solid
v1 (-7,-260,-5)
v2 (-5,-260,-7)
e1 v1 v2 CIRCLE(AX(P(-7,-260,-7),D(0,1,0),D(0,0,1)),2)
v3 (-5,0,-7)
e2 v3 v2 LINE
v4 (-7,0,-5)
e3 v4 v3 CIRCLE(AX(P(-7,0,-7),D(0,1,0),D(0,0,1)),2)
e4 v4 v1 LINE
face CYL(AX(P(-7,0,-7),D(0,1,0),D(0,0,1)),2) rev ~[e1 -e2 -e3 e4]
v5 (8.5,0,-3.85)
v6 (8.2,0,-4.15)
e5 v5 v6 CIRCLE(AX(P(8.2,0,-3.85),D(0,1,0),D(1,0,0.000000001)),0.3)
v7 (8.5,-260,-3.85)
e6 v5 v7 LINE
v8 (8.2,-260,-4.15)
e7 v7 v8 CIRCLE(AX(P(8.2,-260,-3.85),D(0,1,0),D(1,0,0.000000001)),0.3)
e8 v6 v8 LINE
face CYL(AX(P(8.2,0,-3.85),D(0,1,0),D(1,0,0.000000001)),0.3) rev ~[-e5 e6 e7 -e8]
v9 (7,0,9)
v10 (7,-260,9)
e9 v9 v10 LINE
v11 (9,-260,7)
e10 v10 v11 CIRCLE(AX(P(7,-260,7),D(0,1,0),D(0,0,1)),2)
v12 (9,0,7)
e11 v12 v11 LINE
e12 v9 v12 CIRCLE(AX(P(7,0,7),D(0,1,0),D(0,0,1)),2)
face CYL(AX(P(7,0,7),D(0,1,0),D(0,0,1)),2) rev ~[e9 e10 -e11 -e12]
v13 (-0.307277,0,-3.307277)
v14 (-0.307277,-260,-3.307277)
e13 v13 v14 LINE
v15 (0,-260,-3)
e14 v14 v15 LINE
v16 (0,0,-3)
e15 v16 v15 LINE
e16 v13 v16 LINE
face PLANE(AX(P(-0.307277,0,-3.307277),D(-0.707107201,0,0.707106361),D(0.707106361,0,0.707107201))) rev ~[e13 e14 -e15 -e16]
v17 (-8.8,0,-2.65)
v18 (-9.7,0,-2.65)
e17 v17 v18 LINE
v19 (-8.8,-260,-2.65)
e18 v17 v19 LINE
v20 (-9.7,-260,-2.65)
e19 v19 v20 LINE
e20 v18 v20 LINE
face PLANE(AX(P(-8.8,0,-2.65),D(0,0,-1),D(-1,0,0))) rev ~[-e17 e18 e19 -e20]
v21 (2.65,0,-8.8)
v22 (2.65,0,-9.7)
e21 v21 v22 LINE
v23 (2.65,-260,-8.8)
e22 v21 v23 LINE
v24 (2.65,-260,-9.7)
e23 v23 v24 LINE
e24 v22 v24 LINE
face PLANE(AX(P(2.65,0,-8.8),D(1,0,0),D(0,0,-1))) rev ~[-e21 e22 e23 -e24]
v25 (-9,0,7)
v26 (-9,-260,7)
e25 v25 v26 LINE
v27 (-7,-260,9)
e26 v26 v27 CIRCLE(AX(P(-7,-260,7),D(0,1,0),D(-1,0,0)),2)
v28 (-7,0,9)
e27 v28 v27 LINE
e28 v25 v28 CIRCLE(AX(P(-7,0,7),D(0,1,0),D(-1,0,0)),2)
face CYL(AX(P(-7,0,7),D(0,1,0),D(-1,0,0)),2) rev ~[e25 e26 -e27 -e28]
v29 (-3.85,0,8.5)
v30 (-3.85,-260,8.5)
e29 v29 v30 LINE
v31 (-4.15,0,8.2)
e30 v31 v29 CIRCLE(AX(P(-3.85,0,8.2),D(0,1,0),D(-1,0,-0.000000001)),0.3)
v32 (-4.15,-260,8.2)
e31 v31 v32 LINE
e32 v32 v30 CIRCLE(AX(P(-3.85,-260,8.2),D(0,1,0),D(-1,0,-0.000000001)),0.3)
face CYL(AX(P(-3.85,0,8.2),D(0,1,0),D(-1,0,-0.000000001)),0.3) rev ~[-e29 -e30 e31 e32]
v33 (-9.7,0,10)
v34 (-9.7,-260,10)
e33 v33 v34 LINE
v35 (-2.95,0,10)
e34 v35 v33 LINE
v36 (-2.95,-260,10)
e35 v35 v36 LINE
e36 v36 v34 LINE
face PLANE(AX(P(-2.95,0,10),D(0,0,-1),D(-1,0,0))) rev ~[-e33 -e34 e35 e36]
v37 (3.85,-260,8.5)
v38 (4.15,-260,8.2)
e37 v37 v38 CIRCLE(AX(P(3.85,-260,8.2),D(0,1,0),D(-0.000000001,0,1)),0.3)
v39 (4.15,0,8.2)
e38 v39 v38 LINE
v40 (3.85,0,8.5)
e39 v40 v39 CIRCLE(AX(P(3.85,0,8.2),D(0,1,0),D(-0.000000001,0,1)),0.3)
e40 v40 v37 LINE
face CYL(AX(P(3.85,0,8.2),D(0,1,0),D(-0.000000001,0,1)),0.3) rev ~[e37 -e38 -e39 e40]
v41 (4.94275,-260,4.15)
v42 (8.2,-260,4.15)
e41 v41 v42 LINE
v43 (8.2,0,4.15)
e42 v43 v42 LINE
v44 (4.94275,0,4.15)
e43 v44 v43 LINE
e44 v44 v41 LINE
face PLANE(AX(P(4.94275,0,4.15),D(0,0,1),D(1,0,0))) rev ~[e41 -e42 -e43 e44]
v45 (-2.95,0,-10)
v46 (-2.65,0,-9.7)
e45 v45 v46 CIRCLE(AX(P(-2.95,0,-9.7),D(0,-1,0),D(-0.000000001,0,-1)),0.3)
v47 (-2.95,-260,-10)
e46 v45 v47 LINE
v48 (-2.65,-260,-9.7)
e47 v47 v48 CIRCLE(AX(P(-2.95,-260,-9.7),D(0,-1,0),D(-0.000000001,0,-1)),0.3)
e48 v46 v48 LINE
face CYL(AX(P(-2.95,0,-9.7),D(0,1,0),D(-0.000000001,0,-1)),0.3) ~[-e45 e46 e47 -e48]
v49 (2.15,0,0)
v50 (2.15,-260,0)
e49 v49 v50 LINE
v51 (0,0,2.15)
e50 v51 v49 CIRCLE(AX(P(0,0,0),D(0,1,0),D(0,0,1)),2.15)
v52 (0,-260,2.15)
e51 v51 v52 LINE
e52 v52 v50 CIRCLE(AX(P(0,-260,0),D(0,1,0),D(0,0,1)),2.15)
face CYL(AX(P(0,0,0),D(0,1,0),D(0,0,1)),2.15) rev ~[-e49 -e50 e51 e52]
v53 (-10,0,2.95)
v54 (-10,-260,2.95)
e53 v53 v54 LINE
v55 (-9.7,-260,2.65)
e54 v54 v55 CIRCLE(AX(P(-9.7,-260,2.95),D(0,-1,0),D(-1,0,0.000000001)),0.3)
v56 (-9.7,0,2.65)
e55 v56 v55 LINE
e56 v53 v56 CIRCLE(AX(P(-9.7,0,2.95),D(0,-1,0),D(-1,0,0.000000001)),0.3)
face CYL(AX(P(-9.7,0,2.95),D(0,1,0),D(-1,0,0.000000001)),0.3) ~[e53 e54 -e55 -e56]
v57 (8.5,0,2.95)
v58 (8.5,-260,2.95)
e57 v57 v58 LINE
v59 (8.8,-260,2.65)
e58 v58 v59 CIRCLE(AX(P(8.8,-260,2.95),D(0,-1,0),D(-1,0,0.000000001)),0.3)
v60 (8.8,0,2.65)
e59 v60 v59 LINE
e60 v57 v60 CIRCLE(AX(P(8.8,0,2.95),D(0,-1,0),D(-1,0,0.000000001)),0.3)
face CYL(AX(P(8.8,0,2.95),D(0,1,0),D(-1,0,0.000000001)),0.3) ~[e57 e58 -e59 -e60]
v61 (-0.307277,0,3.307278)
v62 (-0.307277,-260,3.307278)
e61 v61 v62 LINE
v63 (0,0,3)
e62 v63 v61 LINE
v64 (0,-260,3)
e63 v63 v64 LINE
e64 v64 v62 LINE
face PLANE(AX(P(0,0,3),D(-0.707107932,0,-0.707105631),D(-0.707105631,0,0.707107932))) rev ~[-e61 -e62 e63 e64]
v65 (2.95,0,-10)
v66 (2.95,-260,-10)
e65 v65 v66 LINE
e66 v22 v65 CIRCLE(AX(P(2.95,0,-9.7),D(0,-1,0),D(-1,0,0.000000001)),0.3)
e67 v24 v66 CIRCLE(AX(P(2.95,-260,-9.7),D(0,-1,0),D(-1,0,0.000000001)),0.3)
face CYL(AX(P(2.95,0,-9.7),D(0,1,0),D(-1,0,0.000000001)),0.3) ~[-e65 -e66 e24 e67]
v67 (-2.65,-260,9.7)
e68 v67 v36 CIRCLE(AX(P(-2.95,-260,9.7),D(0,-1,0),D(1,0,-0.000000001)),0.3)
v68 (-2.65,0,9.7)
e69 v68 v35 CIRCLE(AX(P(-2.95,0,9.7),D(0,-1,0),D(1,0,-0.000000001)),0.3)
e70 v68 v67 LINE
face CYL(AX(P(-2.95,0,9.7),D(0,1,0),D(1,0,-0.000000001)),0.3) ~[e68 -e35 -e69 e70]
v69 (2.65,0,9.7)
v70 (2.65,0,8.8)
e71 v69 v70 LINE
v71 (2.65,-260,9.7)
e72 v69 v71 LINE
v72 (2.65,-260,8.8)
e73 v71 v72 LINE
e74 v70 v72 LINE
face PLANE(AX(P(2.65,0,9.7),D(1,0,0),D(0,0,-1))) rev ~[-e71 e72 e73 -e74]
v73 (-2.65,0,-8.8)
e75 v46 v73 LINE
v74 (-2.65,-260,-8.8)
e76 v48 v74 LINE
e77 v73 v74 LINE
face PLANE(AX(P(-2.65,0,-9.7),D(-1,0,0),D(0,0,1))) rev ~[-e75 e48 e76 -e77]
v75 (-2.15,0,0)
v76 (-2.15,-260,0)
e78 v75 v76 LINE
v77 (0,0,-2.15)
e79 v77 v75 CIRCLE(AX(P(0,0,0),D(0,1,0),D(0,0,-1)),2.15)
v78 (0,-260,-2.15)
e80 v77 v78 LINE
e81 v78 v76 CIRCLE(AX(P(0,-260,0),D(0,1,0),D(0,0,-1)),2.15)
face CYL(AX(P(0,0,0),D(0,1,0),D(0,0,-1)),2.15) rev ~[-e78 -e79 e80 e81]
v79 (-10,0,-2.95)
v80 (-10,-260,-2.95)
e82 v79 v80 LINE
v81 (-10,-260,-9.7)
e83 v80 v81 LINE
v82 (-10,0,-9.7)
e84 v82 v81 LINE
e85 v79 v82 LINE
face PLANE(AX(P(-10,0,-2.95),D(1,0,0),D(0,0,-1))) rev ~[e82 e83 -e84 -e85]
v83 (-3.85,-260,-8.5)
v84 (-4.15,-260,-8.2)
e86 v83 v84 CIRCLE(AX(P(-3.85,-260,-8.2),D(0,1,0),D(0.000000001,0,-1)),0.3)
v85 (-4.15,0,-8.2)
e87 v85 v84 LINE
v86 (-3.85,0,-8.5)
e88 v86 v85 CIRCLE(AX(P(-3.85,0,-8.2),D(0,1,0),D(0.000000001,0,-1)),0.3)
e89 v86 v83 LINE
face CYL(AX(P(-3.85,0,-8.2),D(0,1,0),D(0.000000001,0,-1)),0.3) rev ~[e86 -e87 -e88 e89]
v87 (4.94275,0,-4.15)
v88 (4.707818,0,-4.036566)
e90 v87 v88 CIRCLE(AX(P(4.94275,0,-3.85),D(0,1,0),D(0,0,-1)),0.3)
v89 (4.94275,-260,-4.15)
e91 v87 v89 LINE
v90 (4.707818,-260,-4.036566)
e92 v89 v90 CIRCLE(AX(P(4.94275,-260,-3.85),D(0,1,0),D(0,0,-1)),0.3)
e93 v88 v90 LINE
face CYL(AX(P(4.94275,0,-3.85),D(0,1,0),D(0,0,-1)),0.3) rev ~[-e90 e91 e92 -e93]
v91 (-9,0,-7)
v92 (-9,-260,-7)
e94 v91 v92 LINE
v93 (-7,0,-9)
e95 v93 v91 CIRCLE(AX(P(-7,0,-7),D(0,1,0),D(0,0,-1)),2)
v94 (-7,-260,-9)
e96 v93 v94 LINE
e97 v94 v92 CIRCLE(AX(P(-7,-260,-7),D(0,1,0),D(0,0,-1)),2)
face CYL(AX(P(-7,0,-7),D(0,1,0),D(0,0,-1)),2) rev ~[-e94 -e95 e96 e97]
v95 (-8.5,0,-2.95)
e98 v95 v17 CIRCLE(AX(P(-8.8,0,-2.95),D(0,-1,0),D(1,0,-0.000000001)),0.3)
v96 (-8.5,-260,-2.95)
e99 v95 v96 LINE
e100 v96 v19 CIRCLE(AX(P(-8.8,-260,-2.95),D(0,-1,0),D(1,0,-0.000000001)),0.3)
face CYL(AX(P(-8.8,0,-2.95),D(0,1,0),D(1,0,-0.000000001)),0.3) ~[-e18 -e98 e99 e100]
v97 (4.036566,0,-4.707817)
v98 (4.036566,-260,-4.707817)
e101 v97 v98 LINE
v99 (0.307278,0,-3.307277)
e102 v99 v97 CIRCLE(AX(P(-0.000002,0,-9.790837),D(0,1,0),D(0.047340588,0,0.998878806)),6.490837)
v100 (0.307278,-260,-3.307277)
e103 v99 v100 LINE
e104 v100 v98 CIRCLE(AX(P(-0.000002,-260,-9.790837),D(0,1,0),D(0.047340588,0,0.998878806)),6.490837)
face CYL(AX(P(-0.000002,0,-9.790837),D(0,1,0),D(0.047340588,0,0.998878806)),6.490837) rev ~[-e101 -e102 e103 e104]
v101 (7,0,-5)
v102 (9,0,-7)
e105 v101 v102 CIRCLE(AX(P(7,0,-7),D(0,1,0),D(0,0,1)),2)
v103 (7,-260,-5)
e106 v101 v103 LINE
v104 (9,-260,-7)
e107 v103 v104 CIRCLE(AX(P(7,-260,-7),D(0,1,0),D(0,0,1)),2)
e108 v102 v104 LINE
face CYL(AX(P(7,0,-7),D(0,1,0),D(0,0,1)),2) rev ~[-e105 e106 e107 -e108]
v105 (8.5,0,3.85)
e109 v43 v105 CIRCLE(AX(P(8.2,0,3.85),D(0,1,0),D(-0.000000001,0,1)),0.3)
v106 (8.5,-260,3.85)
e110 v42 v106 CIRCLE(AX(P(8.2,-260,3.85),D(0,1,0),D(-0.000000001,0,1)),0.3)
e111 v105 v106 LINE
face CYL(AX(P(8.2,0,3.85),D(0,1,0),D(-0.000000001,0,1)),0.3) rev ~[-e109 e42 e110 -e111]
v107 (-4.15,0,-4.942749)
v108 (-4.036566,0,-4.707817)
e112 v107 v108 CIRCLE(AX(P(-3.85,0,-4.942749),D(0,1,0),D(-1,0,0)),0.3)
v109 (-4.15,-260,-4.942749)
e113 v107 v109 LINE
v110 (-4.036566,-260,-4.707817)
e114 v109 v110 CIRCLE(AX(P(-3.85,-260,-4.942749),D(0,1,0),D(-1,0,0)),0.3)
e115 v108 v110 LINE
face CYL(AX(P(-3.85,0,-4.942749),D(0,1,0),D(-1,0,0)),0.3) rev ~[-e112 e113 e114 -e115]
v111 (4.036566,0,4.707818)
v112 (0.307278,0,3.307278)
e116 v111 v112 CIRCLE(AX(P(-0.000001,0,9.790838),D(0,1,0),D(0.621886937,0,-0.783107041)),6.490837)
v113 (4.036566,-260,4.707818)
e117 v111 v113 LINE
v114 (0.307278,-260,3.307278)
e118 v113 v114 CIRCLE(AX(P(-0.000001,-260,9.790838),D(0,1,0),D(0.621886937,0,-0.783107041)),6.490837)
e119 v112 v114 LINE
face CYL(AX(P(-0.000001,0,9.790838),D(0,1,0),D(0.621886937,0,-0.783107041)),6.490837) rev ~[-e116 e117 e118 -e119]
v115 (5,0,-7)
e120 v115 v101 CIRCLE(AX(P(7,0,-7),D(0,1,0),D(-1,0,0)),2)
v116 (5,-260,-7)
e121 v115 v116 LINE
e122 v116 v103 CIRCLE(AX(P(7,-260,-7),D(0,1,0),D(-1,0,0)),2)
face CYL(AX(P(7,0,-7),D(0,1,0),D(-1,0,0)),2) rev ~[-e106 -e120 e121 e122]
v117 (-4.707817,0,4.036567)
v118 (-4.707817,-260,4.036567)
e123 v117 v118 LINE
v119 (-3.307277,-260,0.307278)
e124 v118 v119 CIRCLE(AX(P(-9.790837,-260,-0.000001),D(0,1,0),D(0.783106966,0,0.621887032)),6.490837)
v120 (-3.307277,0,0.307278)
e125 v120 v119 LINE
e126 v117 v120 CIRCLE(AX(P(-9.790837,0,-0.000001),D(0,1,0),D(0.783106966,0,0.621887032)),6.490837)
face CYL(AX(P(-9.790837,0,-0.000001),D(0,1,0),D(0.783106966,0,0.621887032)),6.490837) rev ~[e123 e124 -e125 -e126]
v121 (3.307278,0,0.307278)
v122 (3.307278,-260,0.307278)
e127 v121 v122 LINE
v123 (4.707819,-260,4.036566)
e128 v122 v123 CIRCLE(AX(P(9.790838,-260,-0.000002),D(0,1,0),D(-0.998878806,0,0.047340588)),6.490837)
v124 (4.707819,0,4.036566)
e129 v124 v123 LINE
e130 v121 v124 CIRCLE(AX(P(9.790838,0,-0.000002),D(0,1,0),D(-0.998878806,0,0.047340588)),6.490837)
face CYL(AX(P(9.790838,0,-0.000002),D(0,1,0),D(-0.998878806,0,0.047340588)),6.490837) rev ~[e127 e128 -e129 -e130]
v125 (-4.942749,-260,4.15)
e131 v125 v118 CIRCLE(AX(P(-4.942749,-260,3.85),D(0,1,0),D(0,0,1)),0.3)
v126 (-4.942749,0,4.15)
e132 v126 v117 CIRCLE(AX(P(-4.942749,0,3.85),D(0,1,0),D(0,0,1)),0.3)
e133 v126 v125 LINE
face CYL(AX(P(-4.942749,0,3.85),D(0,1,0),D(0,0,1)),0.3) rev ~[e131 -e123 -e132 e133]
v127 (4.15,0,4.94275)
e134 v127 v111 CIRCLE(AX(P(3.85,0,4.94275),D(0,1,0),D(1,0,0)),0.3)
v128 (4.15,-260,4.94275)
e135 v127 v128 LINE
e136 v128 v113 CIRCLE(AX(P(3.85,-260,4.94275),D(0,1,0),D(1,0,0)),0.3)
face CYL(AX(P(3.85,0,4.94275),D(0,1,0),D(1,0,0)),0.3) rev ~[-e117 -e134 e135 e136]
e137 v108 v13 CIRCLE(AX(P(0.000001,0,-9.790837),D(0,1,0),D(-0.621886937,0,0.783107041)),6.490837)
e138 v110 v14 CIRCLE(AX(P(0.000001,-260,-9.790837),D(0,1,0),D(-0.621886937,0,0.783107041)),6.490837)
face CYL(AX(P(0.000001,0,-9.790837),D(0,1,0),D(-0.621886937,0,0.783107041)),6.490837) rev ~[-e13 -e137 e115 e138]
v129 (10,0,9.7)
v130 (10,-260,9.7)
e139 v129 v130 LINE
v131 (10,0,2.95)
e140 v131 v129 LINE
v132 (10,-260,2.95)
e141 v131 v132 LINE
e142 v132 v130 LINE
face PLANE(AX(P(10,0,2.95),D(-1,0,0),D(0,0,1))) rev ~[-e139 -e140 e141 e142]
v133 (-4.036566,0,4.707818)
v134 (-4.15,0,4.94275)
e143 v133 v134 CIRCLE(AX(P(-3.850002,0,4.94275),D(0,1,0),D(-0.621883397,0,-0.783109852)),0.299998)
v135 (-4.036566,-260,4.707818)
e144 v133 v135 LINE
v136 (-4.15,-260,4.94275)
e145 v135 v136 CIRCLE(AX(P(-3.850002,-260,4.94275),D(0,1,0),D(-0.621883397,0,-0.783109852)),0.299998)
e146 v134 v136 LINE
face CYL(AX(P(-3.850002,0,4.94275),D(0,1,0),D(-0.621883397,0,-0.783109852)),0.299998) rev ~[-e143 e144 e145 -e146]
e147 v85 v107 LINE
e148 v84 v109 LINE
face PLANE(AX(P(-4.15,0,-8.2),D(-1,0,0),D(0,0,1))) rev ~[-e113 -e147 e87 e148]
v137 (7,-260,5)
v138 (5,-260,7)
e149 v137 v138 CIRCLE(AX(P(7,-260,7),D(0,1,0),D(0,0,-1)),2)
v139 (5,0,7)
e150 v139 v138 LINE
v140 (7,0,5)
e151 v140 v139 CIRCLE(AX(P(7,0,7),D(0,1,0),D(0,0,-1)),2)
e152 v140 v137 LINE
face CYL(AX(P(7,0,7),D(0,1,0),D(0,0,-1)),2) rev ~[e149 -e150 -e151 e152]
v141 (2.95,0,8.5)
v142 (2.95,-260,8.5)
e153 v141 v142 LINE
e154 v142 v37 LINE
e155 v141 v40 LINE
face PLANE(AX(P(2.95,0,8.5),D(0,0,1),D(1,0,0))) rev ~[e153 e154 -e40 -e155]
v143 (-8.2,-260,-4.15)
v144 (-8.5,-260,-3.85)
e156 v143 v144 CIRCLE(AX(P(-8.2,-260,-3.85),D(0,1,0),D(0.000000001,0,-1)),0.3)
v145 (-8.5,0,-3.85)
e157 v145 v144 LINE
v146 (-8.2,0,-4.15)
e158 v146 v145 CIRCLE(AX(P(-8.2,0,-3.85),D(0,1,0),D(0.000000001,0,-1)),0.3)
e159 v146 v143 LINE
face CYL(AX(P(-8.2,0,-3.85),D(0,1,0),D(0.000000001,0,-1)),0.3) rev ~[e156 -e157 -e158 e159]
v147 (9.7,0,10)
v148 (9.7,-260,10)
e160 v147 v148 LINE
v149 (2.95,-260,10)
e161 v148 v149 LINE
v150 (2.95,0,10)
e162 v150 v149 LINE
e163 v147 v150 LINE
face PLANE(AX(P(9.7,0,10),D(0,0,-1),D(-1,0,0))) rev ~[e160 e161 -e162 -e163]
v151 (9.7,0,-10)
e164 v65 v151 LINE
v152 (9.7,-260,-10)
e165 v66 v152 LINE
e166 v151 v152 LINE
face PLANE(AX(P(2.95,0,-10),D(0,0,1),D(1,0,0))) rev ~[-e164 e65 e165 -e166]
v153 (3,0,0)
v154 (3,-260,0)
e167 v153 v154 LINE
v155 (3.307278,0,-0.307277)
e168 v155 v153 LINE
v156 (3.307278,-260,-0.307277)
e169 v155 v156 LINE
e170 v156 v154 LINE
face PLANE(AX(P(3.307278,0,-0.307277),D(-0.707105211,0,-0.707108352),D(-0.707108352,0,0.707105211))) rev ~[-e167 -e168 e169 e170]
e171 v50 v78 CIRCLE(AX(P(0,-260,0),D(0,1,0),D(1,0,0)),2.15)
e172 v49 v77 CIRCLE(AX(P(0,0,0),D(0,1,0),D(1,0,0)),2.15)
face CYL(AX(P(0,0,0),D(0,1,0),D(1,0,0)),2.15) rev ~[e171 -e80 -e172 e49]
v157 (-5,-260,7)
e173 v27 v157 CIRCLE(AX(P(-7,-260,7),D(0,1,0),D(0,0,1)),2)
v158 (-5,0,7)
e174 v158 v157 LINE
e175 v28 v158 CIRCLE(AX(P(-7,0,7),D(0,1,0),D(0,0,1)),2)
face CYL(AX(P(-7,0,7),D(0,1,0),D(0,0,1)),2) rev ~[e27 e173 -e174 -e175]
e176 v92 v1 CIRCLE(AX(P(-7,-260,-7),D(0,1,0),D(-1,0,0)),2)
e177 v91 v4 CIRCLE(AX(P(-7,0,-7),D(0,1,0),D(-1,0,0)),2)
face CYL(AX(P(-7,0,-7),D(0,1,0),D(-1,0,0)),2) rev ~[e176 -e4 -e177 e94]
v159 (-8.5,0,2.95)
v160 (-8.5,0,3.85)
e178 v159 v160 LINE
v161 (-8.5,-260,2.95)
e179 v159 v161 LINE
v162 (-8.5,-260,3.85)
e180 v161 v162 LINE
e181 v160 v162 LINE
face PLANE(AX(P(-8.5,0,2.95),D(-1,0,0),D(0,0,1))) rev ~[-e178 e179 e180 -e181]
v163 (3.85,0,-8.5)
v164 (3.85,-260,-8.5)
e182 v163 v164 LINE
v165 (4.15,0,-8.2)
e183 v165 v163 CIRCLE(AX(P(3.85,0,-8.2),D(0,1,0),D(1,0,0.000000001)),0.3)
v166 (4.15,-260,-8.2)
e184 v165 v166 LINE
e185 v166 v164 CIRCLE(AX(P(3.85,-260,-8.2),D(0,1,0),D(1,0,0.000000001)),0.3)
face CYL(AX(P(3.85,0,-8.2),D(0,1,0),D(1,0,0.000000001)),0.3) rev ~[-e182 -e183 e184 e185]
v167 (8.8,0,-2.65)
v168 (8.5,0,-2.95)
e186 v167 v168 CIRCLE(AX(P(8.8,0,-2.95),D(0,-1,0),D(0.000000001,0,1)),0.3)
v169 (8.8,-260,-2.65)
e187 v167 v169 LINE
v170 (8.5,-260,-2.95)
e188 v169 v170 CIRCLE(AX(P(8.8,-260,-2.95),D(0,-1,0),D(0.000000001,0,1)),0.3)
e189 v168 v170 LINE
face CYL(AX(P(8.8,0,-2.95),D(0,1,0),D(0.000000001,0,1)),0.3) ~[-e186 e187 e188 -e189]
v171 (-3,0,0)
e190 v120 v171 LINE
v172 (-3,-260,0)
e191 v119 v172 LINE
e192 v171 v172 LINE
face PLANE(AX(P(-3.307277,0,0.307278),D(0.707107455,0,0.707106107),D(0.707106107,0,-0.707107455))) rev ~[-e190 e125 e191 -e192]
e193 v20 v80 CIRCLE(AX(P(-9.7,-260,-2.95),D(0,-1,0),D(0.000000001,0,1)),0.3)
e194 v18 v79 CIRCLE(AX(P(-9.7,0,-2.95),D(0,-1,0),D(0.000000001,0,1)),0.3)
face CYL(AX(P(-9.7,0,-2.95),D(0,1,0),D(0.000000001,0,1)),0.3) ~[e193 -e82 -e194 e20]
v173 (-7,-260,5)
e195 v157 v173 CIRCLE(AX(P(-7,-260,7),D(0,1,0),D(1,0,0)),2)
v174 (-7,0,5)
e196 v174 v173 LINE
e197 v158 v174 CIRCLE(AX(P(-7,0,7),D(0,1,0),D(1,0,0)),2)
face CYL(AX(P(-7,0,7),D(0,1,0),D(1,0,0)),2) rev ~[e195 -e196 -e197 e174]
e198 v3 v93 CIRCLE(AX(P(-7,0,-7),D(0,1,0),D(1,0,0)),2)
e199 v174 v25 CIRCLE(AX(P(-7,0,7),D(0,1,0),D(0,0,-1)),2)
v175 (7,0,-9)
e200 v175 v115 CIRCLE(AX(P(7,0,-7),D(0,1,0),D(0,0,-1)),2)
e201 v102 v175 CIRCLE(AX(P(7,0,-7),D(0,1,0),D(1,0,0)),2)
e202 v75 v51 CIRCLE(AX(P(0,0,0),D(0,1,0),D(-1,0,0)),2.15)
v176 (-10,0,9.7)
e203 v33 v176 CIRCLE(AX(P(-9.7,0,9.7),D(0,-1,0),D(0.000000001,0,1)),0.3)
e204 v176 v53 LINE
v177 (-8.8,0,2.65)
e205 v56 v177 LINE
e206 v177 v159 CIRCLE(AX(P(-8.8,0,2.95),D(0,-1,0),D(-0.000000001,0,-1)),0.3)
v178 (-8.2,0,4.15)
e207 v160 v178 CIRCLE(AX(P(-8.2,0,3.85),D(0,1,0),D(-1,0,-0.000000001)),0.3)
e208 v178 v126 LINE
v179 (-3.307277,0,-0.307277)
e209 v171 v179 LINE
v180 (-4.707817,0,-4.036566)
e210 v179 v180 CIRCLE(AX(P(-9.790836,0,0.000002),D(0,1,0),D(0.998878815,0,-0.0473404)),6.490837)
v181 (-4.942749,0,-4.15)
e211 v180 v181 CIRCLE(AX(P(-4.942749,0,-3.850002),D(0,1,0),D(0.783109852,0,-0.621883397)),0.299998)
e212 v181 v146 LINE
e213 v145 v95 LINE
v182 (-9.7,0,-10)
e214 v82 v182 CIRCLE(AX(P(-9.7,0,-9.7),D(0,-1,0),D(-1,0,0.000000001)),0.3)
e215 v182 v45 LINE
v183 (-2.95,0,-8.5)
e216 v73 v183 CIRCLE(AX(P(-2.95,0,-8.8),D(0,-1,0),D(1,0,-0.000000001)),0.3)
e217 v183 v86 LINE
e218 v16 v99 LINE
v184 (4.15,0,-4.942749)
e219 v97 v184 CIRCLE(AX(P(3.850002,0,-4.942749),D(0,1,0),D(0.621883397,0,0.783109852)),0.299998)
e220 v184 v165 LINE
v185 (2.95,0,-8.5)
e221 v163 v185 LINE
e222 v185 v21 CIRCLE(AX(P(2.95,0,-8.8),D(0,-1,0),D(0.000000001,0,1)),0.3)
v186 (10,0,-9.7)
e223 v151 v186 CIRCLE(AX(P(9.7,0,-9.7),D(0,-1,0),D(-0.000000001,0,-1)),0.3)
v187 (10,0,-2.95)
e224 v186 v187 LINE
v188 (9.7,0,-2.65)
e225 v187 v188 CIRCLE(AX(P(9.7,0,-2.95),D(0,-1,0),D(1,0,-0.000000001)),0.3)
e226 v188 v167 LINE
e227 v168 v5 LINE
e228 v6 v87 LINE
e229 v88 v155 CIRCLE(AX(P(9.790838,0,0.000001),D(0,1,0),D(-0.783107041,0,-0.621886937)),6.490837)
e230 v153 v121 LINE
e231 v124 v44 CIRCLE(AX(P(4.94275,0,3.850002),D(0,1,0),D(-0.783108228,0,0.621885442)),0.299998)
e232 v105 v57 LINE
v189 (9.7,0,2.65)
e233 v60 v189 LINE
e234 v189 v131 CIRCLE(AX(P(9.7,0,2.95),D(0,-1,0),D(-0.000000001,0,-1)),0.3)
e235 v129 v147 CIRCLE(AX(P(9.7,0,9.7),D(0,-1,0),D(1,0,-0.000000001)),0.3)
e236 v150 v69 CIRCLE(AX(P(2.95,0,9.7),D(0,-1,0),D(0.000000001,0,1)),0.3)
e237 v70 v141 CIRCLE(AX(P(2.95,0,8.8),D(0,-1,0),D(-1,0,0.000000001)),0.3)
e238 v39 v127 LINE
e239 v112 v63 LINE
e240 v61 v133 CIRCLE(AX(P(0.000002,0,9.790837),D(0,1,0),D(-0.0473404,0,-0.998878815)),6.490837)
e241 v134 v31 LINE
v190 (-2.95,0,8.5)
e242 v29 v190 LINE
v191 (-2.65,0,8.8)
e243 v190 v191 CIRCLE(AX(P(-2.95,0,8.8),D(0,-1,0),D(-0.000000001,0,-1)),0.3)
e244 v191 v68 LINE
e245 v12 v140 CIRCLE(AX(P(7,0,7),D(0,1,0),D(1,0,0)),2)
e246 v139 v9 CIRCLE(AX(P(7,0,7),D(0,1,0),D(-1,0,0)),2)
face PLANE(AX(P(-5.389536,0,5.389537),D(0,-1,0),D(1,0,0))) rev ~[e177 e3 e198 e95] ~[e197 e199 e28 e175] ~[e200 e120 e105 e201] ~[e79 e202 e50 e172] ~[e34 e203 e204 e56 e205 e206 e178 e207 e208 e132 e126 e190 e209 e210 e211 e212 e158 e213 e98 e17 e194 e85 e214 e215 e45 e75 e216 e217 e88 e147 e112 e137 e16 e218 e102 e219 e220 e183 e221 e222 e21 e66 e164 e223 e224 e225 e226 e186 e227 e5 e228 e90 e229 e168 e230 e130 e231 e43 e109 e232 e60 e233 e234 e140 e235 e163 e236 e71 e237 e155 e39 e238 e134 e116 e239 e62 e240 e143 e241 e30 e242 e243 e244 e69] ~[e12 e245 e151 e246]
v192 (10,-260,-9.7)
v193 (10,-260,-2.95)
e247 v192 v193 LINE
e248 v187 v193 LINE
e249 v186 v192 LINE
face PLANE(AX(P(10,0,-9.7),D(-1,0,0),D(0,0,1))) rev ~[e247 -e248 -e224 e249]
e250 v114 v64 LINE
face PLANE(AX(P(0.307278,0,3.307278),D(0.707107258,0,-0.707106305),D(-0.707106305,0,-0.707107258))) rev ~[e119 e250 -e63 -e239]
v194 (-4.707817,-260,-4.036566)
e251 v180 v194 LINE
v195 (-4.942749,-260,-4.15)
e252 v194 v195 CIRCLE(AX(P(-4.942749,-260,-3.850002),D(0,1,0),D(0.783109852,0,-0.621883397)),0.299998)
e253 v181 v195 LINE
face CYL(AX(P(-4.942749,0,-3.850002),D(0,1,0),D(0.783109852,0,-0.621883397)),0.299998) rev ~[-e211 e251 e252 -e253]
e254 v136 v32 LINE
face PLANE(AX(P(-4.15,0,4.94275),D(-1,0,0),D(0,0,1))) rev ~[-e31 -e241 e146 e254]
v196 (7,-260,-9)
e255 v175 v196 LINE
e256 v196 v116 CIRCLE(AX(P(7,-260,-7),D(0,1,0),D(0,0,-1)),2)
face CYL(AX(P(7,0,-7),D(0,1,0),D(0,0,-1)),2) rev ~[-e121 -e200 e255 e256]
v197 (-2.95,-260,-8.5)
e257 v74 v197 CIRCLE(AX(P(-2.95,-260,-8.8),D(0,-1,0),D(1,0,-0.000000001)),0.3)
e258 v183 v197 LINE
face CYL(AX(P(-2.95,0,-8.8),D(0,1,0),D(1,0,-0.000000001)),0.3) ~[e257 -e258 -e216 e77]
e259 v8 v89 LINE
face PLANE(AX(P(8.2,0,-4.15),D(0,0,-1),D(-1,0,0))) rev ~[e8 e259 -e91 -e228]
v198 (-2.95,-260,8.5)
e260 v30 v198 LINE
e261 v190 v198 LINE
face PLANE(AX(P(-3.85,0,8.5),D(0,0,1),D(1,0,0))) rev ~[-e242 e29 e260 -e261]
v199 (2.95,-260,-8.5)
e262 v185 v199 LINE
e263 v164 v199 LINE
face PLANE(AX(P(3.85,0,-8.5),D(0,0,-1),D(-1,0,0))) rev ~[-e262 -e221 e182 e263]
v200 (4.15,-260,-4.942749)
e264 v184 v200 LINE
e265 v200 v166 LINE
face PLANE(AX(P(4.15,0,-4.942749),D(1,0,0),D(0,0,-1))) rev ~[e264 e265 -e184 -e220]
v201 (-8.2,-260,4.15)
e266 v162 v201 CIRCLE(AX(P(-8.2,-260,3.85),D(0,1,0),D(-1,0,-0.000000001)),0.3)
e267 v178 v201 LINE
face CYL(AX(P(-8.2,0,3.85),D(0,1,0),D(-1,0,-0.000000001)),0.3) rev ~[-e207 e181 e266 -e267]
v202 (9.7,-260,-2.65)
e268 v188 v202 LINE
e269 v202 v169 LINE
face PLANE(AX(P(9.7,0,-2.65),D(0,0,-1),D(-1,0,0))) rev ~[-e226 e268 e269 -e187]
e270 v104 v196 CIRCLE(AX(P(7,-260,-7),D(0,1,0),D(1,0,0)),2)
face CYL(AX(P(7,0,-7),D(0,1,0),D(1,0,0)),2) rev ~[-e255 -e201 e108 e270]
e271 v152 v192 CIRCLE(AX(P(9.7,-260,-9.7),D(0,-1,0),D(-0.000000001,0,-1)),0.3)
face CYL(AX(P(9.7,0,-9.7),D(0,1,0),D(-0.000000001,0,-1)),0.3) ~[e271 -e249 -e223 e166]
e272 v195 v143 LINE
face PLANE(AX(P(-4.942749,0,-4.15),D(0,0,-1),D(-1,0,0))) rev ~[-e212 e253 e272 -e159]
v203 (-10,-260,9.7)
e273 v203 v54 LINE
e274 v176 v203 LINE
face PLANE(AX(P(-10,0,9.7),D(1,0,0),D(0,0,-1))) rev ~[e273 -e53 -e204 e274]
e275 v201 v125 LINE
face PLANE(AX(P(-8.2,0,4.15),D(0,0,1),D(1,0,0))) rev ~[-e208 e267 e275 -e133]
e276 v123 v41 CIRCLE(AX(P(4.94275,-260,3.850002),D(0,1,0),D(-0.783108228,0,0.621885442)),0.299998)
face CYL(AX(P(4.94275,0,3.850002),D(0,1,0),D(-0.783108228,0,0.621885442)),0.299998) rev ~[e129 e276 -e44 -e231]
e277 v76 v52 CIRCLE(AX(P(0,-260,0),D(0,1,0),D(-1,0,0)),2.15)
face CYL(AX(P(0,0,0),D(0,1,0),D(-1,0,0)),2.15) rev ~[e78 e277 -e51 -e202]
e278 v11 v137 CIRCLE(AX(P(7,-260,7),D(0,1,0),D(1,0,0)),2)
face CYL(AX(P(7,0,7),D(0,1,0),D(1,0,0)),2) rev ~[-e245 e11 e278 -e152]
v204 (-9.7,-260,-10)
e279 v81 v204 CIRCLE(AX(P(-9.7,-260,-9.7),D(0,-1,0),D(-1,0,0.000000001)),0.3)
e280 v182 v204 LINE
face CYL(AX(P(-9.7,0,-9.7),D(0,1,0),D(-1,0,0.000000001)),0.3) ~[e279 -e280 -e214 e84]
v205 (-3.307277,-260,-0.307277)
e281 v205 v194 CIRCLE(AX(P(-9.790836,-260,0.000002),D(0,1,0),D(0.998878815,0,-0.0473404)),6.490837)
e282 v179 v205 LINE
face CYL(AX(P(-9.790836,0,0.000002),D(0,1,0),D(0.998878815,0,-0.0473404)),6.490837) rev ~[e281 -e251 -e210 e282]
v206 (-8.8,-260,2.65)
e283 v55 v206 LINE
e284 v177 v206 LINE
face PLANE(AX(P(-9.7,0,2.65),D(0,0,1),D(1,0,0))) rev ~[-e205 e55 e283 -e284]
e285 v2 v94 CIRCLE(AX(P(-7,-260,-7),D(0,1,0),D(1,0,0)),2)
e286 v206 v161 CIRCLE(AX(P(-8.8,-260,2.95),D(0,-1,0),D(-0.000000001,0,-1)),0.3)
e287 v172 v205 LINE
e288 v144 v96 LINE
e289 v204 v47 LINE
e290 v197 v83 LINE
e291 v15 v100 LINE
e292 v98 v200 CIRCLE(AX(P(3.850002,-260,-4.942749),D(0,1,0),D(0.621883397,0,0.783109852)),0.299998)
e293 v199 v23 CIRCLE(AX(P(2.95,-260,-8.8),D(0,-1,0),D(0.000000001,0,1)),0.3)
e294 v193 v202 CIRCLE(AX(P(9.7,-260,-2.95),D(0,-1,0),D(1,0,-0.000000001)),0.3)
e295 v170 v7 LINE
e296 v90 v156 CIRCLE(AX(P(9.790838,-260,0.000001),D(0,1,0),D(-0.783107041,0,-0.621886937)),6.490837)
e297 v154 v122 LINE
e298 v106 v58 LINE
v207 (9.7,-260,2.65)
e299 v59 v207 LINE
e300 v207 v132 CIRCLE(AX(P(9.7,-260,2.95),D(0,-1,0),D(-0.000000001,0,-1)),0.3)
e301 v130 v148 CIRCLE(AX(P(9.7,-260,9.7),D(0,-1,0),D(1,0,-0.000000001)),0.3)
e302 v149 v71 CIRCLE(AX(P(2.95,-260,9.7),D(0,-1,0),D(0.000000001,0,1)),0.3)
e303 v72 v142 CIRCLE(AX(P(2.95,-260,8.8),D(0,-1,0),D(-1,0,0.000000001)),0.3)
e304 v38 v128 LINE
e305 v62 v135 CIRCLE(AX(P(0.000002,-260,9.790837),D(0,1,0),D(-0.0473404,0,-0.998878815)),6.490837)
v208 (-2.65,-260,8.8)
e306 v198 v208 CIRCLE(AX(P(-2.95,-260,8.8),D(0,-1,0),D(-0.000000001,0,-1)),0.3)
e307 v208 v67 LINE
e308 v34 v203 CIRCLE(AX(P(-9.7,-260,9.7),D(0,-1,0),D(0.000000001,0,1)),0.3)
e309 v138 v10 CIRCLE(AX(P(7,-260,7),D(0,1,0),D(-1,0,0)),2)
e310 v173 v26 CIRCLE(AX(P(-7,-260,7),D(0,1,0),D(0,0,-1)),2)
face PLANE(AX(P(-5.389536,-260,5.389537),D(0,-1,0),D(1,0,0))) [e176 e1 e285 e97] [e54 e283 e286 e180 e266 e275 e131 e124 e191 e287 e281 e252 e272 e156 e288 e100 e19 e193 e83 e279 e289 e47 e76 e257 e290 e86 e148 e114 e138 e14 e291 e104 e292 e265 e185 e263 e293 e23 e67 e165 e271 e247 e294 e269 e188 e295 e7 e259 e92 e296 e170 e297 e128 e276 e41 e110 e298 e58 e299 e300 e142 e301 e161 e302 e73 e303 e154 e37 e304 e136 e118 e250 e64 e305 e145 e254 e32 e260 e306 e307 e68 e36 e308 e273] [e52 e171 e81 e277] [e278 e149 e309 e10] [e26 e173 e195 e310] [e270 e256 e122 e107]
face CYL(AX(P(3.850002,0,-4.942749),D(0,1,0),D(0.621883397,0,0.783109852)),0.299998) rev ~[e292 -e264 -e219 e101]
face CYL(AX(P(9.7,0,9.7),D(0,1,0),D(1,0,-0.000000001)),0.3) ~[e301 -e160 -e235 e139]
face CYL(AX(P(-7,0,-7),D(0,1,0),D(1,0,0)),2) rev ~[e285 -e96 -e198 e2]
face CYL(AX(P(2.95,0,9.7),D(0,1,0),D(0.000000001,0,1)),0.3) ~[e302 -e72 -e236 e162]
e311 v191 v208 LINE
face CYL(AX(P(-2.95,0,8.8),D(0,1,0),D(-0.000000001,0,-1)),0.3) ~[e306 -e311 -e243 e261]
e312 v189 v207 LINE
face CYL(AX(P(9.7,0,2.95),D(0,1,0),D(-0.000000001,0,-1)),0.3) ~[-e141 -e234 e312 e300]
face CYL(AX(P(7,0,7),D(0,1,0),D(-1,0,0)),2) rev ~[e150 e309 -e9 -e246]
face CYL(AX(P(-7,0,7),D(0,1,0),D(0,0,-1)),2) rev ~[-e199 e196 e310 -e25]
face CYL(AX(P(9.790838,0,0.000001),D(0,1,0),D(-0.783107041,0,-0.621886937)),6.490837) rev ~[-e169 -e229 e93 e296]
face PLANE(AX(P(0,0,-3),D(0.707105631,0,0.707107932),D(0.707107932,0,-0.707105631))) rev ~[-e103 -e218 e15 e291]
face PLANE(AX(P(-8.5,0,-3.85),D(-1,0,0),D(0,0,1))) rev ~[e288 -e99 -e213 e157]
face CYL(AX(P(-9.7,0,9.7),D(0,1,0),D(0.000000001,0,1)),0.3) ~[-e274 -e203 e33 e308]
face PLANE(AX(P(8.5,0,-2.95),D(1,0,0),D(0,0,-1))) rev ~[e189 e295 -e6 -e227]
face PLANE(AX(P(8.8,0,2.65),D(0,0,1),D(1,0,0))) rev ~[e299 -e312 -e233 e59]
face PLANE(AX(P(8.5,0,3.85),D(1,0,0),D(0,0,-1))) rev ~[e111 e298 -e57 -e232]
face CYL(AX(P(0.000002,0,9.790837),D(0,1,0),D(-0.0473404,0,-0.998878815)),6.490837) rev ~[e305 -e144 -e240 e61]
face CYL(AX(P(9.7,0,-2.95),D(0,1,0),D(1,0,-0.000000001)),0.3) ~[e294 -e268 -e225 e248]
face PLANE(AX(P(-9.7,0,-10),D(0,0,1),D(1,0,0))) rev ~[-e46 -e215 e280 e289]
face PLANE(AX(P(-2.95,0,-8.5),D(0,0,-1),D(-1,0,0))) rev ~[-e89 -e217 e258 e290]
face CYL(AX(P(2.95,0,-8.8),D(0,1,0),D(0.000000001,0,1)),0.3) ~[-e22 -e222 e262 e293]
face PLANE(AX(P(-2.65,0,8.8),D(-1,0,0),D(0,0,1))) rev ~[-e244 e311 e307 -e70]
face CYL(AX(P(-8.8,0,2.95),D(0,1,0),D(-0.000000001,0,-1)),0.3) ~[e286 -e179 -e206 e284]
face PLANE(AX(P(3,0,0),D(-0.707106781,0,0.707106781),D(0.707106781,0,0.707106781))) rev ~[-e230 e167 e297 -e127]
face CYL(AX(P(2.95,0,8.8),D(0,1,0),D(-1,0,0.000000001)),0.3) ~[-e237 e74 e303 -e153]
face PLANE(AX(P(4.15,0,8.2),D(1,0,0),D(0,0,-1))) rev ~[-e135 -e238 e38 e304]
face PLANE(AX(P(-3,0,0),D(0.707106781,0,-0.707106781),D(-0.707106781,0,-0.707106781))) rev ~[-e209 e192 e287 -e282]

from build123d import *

# Parameters (mm, degrees)
F1_DEPTH = 260


# Not quite as in the source:
# - ends of sketch curves that miss each other by under 0.0002 mm in the source are joined


with BuildPart() as f1:
    # F0 (on Front) → F1 (new body)
    with BuildSketch(Plane.XZ):
        with BuildLine():
            ThreePointArc((-2.15, 0), (-1.5202795796, 1.5202795796), (0, 2.15))
            Line((0, 2.15), (0, 3))
            Line((0, 3), (-0.307277, 3.307278))
            ThreePointArc((-0.307277, 3.307278), (-2.2820211583, 3.7143800615), (-4.036565823, 4.7078182229))
            ThreePointArc((-4.036565823, 4.7078182229), (-4.1201572004, 4.8123081084), (-4.15, 4.94275))
            Line((-4.15, 4.94275), (-4.15, 8.2))
            ThreePointArc((-4.15, 8.2), (-4.0621320344, 8.4121320344), (-3.85, 8.5))
            Line((-3.85, 8.5), (-2.95, 8.5))
            ThreePointArc((-2.95, 8.5), (-2.7378679656, 8.5878679656), (-2.65, 8.8))
            Line((-2.65, 8.8), (-2.65, 9.7))
            ThreePointArc((-2.65, 9.7), (-2.7378679656, 9.9121320344), (-2.95, 10))
            Line((-2.95, 10), (-9.7, 10))
            ThreePointArc((-9.7, 10), (-9.9121320344, 9.9121320344), (-10, 9.7))
            Line((-10, 9.7), (-10, 2.95))
            ThreePointArc((-10, 2.95), (-9.9121320344, 2.7378679656), (-9.7, 2.65))
            Line((-9.7, 2.65), (-8.8, 2.65))
            ThreePointArc((-8.8, 2.65), (-8.5878679656, 2.7378679656), (-8.5, 2.95))
            Line((-8.5, 2.95), (-8.5, 3.85))
            ThreePointArc((-8.5, 3.85), (-8.4121320344, 4.0621320344), (-8.2, 4.15))
            Line((-8.2, 4.15), (-4.942749, 4.15))
            ThreePointArc((-4.942749, 4.15), (-4.812307461, 4.1201573706), (-4.7078173786, 4.0365666993))
            ThreePointArc((-4.7078173786, 4.0365666993), (-3.7143793747, 2.2820219924), (-3.3072773955, 0.3072779813))
            Line((-3.3072773955, 0.3072779813), (-3, 0))
            Line((-3, 0), (-2.15, 0))
        make_face()
        with BuildLine():
            ThreePointArc((-7, 5), (-8.4142135624, 5.5857864376), (-9, 7))
            ThreePointArc((-9, 7), (-8.4142135624, 8.4142135624), (-7, 9))
            ThreePointArc((-7, 9), (-5.5857864376, 8.4142135624), (-5, 7))
            ThreePointArc((-5, 7), (-5.5857864376, 5.5857864376), (-7, 5))
        make_face(mode=Mode.SUBTRACT)
        with BuildLine():
            ThreePointArc((0, 2.15), (1.5202795796, 1.5202795796), (2.15, 0))
            Line((2.15, 0), (3, 0))
            Line((3, 0), (3.307278, 0.307278))
            ThreePointArc((3.307278, 0.307278), (3.7143803747, 2.2820219924), (4.7078187099, 4.0365664363))
            ThreePointArc((4.7078187099, 4.0365664363), (4.812308461, 4.1201573706), (4.94275, 4.15))
            Line((4.94275, 4.15), (8.2, 4.15))
            ThreePointArc((8.2, 4.15), (8.4121320344, 4.0621320344), (8.5, 3.85))
            Line((8.5, 3.85), (8.5, 2.95))
            ThreePointArc((8.5, 2.95), (8.5878679656, 2.7378679656), (8.8, 2.65))
            Line((8.8, 2.65), (9.7, 2.65))
            ThreePointArc((9.7, 2.65), (9.9121320344, 2.7378679656), (10, 2.95))
            Line((10, 2.95), (10, 9.7))
            ThreePointArc((10, 9.7), (9.9121320344, 9.9121320344), (9.7, 10))
            Line((9.7, 10), (2.95, 10))
            ThreePointArc((2.95, 10), (2.7378679656, 9.9121320344), (2.65, 9.7))
            Line((2.65, 9.7), (2.65, 8.8))
            ThreePointArc((2.65, 8.8), (2.7378679656, 8.5878679656), (2.95, 8.5))
            Line((2.95, 8.5), (3.85, 8.5))
            ThreePointArc((3.85, 8.5), (4.0621320344, 8.4121320344), (4.15, 8.2))
            Line((4.15, 8.2), (4.15, 4.94275))
            ThreePointArc((4.15, 4.94275), (4.1201572004, 4.8123081084), (4.036566086, 4.7078178916))
            ThreePointArc((4.036566086, 4.7078178916), (2.2820216259, 3.7143802371), (0.3072779813, 3.3072783955))
            Line((0.3072779813, 3.3072783955), (0, 3))
            Line((0, 3), (0, 2.15))
        make_face()
        with BuildLine():
            ThreePointArc((7, 9), (8.4142135624, 8.4142135624), (9, 7))
            ThreePointArc((9, 7), (8.4142135624, 5.5857864376), (7, 5))
            ThreePointArc((7, 5), (5.5857864376, 5.5857864376), (5, 7))
            ThreePointArc((5, 7), (5.5857864376, 8.4142135624), (7, 9))
        make_face(mode=Mode.SUBTRACT)
        with BuildLine():
            Line((3, 0), (2.15, 0))
            ThreePointArc((2.15, 0), (1.5202795796, -1.5202795796), (0, -2.15))
            Line((0, -2.15), (0, -3))
            Line((0, -3), (0.307278, -3.307277))
            ThreePointArc((0.307278, -3.307277), (2.2820216259, -3.7143792371), (4.036565823, -4.7078172229))
            ThreePointArc((4.036565823, -4.7078172229), (4.1201572004, -4.8123071084), (4.15, -4.942749))
            Line((4.15, -4.942749), (4.15, -8.2))
            ThreePointArc((4.15, -8.2), (4.0621320344, -8.4121320344), (3.85, -8.5))
            Line((3.85, -8.5), (2.95, -8.5))
            ThreePointArc((2.95, -8.5), (2.7378679656, -8.5878679656), (2.65, -8.8))
            Line((2.65, -8.8), (2.65, -9.7))
            ThreePointArc((2.65, -9.7), (2.7378679656, -9.9121320344), (2.95, -10))
            Line((2.95, -10), (9.7, -10))
            ThreePointArc((9.7, -10), (9.9121320344, -9.9121320344), (10, -9.7))
            Line((10, -9.7), (10, -2.95))
            ThreePointArc((10, -2.95), (9.9121320344, -2.7378679656), (9.7, -2.65))
            Line((9.7, -2.65), (8.8, -2.65))
            ThreePointArc((8.8, -2.65), (8.5878679656, -2.7378679656), (8.5, -2.95))
            Line((8.5, -2.95), (8.5, -3.85))
            ThreePointArc((8.5, -3.85), (8.4121320344, -4.0621320344), (8.2, -4.15))
            Line((8.2, -4.15), (4.94275, -4.15))
            ThreePointArc((4.94275, -4.15), (4.8123081084, -4.1201572004), (4.7078178916, -4.036566086))
            ThreePointArc((4.7078178916, -4.036566086), (3.7143800615, -2.2820211583), (3.3072783483, -0.3072769835))
            Line((3.3072783483, -0.3072769835), (3, 0))
        make_face()
        with BuildLine():
            ThreePointArc((7, -5), (8.4142135624, -5.5857864376), (9, -7))
            ThreePointArc((9, -7), (8.4142135624, -8.4142135624), (7, -9))
            ThreePointArc((7, -9), (5.5857864376, -8.4142135624), (5, -7))
            ThreePointArc((5, -7), (5.5857864376, -5.5857864376), (7, -5))
        make_face(mode=Mode.SUBTRACT)
        with BuildLine():
            Line((0, -3), (0, -2.15))
            ThreePointArc((0, -2.15), (-1.5202795796, -1.5202795796), (-2.15, 0))
            Line((-2.15, 0), (-3, 0))
            Line((-3, 0), (-3.307277, -0.307277))
            ThreePointArc((-3.307277, -0.307277), (-3.7143790615, -2.2820211583), (-4.7078172229, -4.036565823))
            ThreePointArc((-4.7078172229, -4.036565823), (-4.8123071084, -4.1201572004), (-4.942749, -4.15))
            Line((-4.942749, -4.15), (-8.2, -4.15))
            ThreePointArc((-8.2, -4.15), (-8.4121320344, -4.0621320344), (-8.5, -3.85))
            Line((-8.5, -3.85), (-8.5, -2.95))
            ThreePointArc((-8.5, -2.95), (-8.5878679656, -2.7378679656), (-8.8, -2.65))
            Line((-8.8, -2.65), (-9.7, -2.65))
            ThreePointArc((-9.7, -2.65), (-9.9121320344, -2.7378679656), (-10, -2.95))
            Line((-10, -2.95), (-10, -9.7))
            ThreePointArc((-10, -9.7), (-9.9121320344, -9.9121320344), (-9.7, -10))
            Line((-9.7, -10), (-2.95, -10))
            ThreePointArc((-2.95, -10), (-2.7378679656, -9.9121320344), (-2.65, -9.7))
            Line((-2.65, -9.7), (-2.65, -8.8))
            ThreePointArc((-2.65, -8.8), (-2.7378679656, -8.5878679656), (-2.95, -8.5))
            Line((-2.95, -8.5), (-3.85, -8.5))
            ThreePointArc((-3.85, -8.5), (-4.0621320344, -8.4121320344), (-4.15, -8.2))
            Line((-4.15, -8.2), (-4.15, -4.942749))
            ThreePointArc((-4.15, -4.942749), (-4.1201572004, -4.8123071084), (-4.036566086, -4.7078168916))
            ThreePointArc((-4.036566086, -4.7078168916), (-2.2820211583, -3.7143790615), (-0.3072769835, -3.3072773483))
            Line((-0.3072769835, -3.3072773483), (0, -3))
        make_face()
        with BuildLine():
            ThreePointArc((-7, -9), (-8.4142135624, -8.4142135624), (-9, -7))
            ThreePointArc((-9, -7), (-8.4142135624, -5.5857864376), (-7, -5))
            ThreePointArc((-7, -5), (-5.5857864376, -5.5857864376), (-5, -7))
            ThreePointArc((-5, -7), (-5.5857864376, -8.4142135624), (-7, -9))
        make_face(mode=Mode.SUBTRACT)
    extrude(amount=F1_DEPTH)


solid = f1.part
